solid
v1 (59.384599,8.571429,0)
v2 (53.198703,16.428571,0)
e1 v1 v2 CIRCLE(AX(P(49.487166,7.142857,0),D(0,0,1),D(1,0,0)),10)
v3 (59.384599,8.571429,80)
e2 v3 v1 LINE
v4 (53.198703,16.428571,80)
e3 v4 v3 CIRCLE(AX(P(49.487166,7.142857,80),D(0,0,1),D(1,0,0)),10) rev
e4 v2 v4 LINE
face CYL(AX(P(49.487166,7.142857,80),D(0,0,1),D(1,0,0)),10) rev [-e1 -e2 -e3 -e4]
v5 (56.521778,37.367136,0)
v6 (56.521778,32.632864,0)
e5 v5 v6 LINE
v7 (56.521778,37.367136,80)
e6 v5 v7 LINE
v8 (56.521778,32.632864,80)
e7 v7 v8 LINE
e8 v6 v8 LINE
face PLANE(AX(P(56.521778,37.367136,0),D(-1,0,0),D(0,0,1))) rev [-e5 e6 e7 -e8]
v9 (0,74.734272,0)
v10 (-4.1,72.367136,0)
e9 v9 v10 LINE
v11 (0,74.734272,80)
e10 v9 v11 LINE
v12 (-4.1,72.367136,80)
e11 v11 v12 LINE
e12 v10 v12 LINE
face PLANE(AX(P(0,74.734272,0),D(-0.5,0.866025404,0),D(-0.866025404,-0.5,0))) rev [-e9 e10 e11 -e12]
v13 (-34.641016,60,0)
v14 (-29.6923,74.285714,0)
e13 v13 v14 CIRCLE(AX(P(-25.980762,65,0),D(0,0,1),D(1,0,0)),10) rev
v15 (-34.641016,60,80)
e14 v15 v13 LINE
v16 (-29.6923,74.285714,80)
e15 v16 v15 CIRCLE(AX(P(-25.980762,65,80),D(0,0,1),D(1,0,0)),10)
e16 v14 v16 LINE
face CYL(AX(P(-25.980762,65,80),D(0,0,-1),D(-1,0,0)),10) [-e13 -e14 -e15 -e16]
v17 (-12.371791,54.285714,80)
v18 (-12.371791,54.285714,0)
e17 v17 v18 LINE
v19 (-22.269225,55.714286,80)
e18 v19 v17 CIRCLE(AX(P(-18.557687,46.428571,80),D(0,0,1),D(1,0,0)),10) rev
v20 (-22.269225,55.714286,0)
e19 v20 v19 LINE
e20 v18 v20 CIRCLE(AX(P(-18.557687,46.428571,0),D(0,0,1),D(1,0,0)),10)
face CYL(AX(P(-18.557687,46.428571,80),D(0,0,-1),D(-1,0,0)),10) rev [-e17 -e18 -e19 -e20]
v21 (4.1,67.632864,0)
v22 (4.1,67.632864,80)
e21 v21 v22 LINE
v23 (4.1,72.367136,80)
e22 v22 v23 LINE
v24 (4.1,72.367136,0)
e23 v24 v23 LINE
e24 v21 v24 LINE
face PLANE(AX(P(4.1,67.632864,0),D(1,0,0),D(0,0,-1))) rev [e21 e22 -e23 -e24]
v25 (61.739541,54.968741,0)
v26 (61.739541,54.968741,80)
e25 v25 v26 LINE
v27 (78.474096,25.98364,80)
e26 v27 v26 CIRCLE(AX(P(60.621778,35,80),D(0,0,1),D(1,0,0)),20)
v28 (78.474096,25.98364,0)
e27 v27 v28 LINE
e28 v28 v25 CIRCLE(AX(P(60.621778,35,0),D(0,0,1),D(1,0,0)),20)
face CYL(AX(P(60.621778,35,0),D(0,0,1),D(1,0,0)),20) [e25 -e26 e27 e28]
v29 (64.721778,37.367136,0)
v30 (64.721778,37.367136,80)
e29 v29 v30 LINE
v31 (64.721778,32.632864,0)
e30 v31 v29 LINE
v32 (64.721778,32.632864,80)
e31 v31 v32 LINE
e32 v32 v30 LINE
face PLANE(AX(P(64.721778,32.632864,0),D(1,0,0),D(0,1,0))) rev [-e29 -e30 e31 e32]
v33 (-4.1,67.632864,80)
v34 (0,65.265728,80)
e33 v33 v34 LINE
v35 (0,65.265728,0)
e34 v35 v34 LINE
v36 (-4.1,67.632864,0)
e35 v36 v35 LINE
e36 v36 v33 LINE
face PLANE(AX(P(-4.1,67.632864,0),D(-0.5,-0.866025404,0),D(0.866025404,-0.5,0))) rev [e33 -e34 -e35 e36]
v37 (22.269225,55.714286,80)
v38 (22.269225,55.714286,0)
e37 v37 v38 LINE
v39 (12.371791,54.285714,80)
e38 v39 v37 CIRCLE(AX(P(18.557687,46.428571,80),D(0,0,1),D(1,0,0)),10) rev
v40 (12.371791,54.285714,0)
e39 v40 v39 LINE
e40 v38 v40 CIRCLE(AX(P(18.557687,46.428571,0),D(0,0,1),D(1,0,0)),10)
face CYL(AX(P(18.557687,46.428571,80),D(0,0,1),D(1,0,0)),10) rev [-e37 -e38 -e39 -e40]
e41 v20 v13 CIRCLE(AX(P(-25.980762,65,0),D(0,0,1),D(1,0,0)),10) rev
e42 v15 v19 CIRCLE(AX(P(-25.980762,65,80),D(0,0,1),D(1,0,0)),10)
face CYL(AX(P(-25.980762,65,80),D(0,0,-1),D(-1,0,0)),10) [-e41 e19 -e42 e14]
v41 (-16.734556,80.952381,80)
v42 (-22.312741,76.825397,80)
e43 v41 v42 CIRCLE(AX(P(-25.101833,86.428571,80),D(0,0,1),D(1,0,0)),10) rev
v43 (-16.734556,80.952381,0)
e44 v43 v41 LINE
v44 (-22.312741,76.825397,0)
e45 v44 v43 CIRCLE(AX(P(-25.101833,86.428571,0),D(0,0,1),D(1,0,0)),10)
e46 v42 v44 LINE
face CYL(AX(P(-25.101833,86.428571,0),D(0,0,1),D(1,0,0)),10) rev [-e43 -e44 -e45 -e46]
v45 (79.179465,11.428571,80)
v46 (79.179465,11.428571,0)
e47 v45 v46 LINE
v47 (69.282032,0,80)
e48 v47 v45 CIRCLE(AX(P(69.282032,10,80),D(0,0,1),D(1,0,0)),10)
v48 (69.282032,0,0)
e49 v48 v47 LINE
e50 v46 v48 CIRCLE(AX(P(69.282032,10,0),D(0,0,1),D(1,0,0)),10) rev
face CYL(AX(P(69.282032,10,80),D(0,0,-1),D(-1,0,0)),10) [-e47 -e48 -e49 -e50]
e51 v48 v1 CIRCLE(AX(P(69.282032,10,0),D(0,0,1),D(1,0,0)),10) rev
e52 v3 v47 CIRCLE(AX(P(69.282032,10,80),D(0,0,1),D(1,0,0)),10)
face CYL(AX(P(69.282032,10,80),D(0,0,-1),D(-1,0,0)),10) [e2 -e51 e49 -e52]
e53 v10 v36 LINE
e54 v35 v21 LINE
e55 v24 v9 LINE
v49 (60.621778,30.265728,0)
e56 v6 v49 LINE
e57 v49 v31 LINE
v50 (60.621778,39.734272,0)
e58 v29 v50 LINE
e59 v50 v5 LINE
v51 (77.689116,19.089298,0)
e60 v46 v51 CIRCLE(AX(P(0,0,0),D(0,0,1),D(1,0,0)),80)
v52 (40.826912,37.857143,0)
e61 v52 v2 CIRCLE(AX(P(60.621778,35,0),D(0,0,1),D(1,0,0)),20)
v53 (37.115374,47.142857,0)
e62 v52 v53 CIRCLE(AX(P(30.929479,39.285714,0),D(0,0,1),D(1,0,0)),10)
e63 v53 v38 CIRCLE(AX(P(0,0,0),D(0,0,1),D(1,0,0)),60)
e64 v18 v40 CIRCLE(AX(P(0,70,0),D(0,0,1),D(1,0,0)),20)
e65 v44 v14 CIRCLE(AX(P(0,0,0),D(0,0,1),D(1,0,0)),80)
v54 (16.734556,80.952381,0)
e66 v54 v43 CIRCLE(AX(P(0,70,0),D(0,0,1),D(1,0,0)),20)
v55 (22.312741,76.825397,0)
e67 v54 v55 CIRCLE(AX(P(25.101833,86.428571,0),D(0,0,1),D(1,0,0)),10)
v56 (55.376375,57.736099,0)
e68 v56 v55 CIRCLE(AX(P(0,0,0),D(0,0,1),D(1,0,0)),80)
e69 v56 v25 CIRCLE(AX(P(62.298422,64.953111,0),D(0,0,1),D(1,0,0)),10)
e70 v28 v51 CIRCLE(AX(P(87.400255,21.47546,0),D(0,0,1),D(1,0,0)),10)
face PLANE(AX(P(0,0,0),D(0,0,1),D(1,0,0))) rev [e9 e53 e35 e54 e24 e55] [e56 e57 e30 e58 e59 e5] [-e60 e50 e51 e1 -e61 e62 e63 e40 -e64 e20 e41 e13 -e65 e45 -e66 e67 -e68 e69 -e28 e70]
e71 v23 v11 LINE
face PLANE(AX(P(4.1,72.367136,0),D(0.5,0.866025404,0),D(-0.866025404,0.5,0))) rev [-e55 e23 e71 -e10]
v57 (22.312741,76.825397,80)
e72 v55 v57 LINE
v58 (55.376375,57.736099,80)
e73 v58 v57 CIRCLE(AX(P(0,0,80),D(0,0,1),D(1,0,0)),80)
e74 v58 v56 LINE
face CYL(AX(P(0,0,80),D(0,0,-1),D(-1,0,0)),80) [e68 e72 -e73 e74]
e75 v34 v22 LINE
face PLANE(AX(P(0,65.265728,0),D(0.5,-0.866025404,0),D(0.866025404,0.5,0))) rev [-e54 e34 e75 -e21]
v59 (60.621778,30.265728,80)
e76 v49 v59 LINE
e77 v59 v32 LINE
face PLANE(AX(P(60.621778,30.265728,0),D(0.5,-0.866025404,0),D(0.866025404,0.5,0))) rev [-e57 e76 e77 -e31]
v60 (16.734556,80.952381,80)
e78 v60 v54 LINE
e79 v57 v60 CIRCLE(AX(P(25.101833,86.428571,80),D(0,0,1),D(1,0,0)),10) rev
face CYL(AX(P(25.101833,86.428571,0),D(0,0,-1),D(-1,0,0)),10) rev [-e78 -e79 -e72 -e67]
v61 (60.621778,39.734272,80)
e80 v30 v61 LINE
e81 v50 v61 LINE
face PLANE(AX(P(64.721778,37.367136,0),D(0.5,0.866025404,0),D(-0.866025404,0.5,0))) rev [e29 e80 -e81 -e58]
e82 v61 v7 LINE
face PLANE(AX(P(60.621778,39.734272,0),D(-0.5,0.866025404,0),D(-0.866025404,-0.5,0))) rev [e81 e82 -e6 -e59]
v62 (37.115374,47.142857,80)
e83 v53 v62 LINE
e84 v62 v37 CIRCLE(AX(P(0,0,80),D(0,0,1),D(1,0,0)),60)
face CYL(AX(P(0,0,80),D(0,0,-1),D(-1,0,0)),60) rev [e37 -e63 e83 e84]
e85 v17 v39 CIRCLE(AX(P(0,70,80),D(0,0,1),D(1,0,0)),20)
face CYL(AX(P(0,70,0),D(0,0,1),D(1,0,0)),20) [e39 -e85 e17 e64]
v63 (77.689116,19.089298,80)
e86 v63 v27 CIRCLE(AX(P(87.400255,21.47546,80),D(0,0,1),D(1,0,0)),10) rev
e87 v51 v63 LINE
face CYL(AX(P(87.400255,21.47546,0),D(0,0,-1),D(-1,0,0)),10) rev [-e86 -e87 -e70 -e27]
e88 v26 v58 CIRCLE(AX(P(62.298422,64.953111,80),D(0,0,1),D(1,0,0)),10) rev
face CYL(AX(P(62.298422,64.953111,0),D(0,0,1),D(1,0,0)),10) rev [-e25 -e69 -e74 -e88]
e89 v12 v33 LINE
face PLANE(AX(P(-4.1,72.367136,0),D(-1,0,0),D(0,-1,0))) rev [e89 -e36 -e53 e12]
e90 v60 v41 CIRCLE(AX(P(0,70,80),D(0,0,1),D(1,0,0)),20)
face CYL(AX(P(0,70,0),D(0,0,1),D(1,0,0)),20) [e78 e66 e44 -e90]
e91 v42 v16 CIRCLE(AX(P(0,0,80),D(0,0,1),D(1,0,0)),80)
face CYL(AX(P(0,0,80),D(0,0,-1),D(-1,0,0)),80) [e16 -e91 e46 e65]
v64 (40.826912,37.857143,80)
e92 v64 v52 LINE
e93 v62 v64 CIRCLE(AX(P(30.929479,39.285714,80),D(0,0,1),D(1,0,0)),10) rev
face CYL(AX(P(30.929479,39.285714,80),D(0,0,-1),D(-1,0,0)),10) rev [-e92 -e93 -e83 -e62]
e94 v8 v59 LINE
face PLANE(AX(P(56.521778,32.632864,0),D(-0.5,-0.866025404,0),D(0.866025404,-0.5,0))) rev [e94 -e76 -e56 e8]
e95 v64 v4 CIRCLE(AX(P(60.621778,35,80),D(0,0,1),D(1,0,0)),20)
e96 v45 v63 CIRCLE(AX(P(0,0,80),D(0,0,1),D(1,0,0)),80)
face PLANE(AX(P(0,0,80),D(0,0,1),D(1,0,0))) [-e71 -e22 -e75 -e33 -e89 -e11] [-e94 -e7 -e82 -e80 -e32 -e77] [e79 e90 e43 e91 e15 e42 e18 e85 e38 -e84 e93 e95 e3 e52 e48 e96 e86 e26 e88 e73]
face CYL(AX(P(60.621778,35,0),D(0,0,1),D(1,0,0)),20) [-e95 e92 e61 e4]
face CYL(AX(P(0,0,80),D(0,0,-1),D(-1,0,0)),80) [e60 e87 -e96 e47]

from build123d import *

# Parameters (mm, degrees)
SKETCH_1_R          = 80
SKETCH_1_R_2        = 60
EXTRUDE_1_DEPTH     = 80
CUT_EXTRUDE_1_DEPTH = 139.564064606
CUT_EXTRUDE_2_DEPTH = 139.564064606
SKETCH_4_R          = 20
SKETCH_4_R_2        = 7.5
EXTRUDE_2_DEPTH     = 80
FILLET_1_R          = 10


with BuildPart() as part:
    # 草图1 → 凸台-拉伸1 (new body)
    with BuildSketch(Plane.XY):
        Circle(SKETCH_1_R)
        Circle(SKETCH_1_R_2, mode=Mode.SUBTRACT)
    extrude(amount=EXTRUDE_1_DEPTH)

    # 草图2 → 切除-拉伸1 (cut, through all)
    with BuildSketch(Plane.XY.offset(80)):
        Polygon((60.621778265, 30.265727793), (64.721778265, 32.632863896), (64.721778265, 37.367136104), (60.621778265, 39.734272207), (56.521778265, 37.367136104), (56.521778265, 32.632863896), align=None)
        Polygon((4.1, 67.632863896), (4.1, 72.367136104), (0, 74.734272207), (-4.1, 72.367136104), (-4.1, 67.632863896), (0, 65.265727793), align=None)
        Polygon((56.521778265, -37.367136104), (60.621778265, -39.734272207), (64.721778265, -37.367136104), (64.721778265, -32.632863896), (60.621778265, -30.265727793), (56.521778265, -32.632863896), align=None)
        Polygon((-4.1, -67.632863896), (-4.1, -72.367136104), (0, -74.734272207), (4.1, -72.367136104), (4.1, -67.632863896), (0, -65.265727793), align=None)
        Polygon((-60.621778265, -30.265727793), (-64.721778265, -32.632863896), (-64.721778265, -37.367136104), (-60.621778265, -39.734272207), (-56.521778265, -37.367136104), (-56.521778265, -32.632863896), align=None)
        Polygon((-56.521778265, 37.367136104), (-60.621778265, 39.734272207), (-64.721778265, 37.367136104), (-64.721778265, 32.632863896), (-60.621778265, 30.265727793), (-56.521778265, 32.632863896), align=None)
    extrude(amount=-CUT_EXTRUDE_1_DEPTH, mode=Mode.SUBTRACT)

    # 草图3 → 切除-拉伸2 (cut, through all)
    with BuildSketch(Plane.XY.offset(80)):
        with BuildLine():
            Line((0, 0), (-40, 69.282032303))
            ThreePointArc((-40, 69.282032303), (-40, -69.282032303), (80, 0))
            Line((80, 0), (0, 0))
        make_face()
    extrude(amount=-CUT_EXTRUDE_2_DEPTH, mode=Mode.SUBTRACT)

    # 草图4 → 凸台-拉伸2 (add)
    # profile 1 of 2: a face of its own
    with BuildSketch(Plane.XY.offset(80)):
        with Locations((0, 70)):
            Circle(SKETCH_4_R)
        with Locations((0, 70)):
            Circle(SKETCH_4_R_2, mode=Mode.SUBTRACT)
    # profile 2 of 2: a face of its own
    with BuildSketch(Plane.XY.offset(80)):
        with Locations((60.621778265, 35)):
            Circle(SKETCH_4_R)
        with Locations((60.621778265, 35)):
            Circle(SKETCH_4_R_2, mode=Mode.SUBTRACT)
    extrude(amount=-EXTRUDE_2_DEPTH)

    # 圆角1
    fillet_1_edges = [part.edges().sort_by_distance(p)[0] for p in [
        (76.622258716, 23.000640628, 40),
        (58.230268445, 54.856502229, 40),
        (18.391990271, 77.857142857, 40),
        (-18.391990271, 77.857142857, 40),
        (15.891853901, 57.857142857, 40),
        (-15.891853901, 57.857142857, 40),
        (58.051682455, 15.165822237, 40),
        (42.159828554, 42.69132062, 40),
    ]]
    fillet(fillet_1_edges, radius=FILLET_1_R)
    fillet_1_2_edges = [part.edges().sort_by_distance(p)[0] for p in [
        (60, 0, 40),
        (80, 0, 40),
        (-30, 51.961524227, 40),
        (-40, 69.282032303, 40),
    ]]
    fillet(fillet_1_2_edges, radius=FILLET_1_R - 0.0001)  # a hair under: the kernel refuses the full size


solid = part.part
